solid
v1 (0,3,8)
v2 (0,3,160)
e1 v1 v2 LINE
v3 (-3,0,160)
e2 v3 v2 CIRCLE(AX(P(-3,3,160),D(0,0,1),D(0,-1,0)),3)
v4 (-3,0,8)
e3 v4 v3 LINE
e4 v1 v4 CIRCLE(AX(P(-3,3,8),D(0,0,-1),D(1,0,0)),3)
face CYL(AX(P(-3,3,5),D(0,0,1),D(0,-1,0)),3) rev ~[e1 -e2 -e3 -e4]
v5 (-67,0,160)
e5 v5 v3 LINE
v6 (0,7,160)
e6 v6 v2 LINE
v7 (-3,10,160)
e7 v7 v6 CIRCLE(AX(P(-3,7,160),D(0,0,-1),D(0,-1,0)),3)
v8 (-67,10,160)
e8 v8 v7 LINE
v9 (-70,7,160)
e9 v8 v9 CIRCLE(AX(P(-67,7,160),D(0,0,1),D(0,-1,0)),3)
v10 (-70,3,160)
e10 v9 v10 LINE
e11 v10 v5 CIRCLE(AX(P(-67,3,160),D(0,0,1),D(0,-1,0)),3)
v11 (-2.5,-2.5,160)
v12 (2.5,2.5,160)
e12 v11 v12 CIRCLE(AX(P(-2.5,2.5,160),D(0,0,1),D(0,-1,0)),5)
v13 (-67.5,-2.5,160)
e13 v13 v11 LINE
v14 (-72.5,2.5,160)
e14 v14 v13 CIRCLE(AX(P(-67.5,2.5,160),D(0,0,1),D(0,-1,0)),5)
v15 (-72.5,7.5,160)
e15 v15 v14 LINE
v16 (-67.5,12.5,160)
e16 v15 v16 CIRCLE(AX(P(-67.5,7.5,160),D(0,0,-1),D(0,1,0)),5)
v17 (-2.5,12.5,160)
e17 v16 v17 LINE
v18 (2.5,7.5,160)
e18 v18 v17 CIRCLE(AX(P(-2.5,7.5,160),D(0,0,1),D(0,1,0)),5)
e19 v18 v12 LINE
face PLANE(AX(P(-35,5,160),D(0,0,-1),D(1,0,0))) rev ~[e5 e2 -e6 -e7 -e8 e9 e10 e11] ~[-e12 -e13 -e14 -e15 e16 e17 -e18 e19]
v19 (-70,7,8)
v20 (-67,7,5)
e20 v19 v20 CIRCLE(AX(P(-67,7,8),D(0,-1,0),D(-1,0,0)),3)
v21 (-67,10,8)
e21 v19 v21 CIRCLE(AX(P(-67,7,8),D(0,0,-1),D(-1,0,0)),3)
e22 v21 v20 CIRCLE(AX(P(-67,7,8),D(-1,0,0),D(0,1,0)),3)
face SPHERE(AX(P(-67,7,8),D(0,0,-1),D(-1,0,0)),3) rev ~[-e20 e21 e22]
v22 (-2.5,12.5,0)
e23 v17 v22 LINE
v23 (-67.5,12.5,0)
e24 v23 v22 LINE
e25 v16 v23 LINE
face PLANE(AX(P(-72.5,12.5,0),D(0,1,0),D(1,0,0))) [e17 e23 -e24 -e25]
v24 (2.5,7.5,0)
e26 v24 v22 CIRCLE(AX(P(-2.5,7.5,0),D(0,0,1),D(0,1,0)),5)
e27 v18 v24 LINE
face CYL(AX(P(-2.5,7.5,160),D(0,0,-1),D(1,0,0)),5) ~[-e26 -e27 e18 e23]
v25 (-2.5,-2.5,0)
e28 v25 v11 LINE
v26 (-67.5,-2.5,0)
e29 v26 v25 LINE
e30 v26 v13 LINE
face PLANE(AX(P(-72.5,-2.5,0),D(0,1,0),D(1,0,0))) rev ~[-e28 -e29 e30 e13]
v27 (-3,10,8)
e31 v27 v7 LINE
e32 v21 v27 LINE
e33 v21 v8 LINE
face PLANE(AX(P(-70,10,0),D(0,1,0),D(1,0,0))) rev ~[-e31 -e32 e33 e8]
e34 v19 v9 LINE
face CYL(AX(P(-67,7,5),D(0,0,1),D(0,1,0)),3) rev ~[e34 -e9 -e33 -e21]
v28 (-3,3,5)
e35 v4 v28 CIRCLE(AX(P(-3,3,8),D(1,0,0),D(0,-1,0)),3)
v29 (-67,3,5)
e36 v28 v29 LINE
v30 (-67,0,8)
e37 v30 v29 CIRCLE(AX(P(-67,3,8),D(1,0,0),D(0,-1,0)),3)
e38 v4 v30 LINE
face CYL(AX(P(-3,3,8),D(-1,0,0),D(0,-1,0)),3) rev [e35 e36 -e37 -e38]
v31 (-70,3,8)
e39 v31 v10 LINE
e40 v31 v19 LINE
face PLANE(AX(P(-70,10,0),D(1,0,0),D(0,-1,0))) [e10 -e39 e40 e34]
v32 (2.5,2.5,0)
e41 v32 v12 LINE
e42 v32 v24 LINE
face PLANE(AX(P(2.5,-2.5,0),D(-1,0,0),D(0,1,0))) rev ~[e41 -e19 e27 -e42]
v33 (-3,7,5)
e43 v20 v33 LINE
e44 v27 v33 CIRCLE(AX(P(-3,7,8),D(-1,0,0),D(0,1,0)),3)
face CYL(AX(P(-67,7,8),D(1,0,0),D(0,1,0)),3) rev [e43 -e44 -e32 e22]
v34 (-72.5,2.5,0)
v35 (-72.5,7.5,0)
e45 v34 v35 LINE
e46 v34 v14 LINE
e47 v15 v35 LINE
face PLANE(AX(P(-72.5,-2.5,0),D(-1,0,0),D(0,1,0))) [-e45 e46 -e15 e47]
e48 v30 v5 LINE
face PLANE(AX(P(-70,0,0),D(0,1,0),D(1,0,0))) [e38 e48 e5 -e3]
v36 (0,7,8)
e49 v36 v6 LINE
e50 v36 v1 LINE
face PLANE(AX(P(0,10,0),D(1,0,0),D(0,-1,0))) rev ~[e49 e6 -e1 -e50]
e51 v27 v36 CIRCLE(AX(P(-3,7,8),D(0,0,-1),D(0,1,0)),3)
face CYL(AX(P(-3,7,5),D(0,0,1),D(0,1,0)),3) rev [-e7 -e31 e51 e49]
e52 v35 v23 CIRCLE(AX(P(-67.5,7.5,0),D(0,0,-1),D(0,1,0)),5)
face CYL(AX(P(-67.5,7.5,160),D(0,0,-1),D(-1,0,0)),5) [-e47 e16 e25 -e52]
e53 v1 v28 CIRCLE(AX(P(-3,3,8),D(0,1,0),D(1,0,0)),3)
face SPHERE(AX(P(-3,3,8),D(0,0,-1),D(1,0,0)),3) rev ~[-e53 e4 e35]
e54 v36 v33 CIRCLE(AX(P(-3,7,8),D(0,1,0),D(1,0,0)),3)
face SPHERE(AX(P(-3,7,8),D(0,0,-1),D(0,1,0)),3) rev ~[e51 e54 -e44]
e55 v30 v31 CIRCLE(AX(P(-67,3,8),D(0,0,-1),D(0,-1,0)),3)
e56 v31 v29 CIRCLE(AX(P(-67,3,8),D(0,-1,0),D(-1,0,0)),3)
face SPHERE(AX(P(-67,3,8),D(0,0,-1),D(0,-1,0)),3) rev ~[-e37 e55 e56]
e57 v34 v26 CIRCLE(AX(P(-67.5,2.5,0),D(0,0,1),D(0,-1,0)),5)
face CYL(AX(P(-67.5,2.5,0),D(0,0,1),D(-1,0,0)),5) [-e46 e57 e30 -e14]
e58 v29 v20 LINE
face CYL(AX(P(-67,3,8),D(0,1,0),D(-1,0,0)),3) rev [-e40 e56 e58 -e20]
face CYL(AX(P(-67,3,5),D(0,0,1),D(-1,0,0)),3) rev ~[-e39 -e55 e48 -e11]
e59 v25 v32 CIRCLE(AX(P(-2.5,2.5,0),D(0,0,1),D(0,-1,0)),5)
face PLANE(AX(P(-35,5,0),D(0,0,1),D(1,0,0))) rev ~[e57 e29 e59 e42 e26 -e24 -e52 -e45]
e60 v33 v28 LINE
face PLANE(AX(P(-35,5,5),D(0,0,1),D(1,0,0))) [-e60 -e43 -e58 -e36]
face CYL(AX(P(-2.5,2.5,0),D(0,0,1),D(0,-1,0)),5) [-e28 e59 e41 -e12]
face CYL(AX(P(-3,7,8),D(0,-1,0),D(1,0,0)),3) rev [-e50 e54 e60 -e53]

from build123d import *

# Parameters (mm, degrees)
F0_W     = 75
F0_H     = 15
F1_DEPTH = 5
F2_W     = 75
F2_H     = 15
F2_W_2   = 70
F2_H_2   = 10
F3_DEPTH = 160
F4_R     = 5
F5_R     = 5
F6_R     = 5
F7_R     = 5
F8_R     = 3
F9_R     = 3
F10_R    = 3
F11_R    = 3
F12_R    = 3


# Not quite as in the source:
# - two fillets or chamfers of one size are made in one step


with BuildPart() as f1:
    # F0 (on Top) → F1 (new body)
    with BuildSketch(Plane.XY):
        with Locations((-35, 5)):
            Rectangle(F0_W, F0_H)
    extrude(amount=F1_DEPTH)

    # F2 (on face) → F3 (join)
    with BuildSketch(Plane(origin=(0, 0, 0), x_dir=(1, 0, 0), z_dir=(0, 0, -1))):
        with Locations((-35, -5)):
            Rectangle(F2_W, F2_H)
        with Locations((-35, -5)):
            Rectangle(F2_W_2, F2_H_2, mode=Mode.SUBTRACT)
    extrude(amount=-F3_DEPTH)

    # F4
    f4_edges = [f1.edges().sort_by_distance(p)[0] for p in [
        (-72.5, 12.5, 80),
    ]]
    fillet(f4_edges, radius=F4_R)

    # F5
    f5_edges = [f1.edges().sort_by_distance(p)[0] for p in [
        (-72.5, -2.5, 80),
    ]]
    fillet(f5_edges, radius=F5_R)

    # F6
    f6_edges = [f1.edges().sort_by_distance(p)[0] for p in [
        (2.5, -2.5, 80),
    ]]
    fillet(f6_edges, radius=F6_R)

    # F7
    f7_edges = [f1.edges().sort_by_distance(p)[0] for p in [
        (2.5, 12.5, 80),
    ]]
    fillet(f7_edges, radius=F7_R)

    # F8
    f8_edges = [f1.edges().sort_by_distance(p)[0] for p in [
        (-70, 10, 82.5),
    ]]
    fillet(f8_edges, radius=F8_R)

    # F9
    f9_edges = [f1.edges().sort_by_distance(p)[0] for p in [
        (0, 10, 82.5),
    ]]
    fillet(f9_edges, radius=F9_R)

    # F10
    f10_edges = [f1.edges().sort_by_distance(p)[0] for p in [
        (-70, 0, 82.5),
    ]]
    fillet(f10_edges, radius=F10_R)

    # F11
    f11_edges = [f1.edges().sort_by_distance(p)[0] for p in [
        (0, 0, 82.5),
    ]]
    fillet(f11_edges, radius=F11_R)

    # F12
    f12_edges = [f1.edges().sort_by_distance(p)[0] for p in [
        (-35, 0, 5),
        (-0.87868, 0.87868, 5),
        (-69.12132, 0.87868, 5),
        (0, 5, 5),
        (-70, 5, 5),
        (-0.87868, 9.12132, 5),
        (-69.12132, 9.12132, 5),
        (-35, 10, 5),
    ]]
    fillet(f12_edges, radius=F12_R)


solid = f1.part
